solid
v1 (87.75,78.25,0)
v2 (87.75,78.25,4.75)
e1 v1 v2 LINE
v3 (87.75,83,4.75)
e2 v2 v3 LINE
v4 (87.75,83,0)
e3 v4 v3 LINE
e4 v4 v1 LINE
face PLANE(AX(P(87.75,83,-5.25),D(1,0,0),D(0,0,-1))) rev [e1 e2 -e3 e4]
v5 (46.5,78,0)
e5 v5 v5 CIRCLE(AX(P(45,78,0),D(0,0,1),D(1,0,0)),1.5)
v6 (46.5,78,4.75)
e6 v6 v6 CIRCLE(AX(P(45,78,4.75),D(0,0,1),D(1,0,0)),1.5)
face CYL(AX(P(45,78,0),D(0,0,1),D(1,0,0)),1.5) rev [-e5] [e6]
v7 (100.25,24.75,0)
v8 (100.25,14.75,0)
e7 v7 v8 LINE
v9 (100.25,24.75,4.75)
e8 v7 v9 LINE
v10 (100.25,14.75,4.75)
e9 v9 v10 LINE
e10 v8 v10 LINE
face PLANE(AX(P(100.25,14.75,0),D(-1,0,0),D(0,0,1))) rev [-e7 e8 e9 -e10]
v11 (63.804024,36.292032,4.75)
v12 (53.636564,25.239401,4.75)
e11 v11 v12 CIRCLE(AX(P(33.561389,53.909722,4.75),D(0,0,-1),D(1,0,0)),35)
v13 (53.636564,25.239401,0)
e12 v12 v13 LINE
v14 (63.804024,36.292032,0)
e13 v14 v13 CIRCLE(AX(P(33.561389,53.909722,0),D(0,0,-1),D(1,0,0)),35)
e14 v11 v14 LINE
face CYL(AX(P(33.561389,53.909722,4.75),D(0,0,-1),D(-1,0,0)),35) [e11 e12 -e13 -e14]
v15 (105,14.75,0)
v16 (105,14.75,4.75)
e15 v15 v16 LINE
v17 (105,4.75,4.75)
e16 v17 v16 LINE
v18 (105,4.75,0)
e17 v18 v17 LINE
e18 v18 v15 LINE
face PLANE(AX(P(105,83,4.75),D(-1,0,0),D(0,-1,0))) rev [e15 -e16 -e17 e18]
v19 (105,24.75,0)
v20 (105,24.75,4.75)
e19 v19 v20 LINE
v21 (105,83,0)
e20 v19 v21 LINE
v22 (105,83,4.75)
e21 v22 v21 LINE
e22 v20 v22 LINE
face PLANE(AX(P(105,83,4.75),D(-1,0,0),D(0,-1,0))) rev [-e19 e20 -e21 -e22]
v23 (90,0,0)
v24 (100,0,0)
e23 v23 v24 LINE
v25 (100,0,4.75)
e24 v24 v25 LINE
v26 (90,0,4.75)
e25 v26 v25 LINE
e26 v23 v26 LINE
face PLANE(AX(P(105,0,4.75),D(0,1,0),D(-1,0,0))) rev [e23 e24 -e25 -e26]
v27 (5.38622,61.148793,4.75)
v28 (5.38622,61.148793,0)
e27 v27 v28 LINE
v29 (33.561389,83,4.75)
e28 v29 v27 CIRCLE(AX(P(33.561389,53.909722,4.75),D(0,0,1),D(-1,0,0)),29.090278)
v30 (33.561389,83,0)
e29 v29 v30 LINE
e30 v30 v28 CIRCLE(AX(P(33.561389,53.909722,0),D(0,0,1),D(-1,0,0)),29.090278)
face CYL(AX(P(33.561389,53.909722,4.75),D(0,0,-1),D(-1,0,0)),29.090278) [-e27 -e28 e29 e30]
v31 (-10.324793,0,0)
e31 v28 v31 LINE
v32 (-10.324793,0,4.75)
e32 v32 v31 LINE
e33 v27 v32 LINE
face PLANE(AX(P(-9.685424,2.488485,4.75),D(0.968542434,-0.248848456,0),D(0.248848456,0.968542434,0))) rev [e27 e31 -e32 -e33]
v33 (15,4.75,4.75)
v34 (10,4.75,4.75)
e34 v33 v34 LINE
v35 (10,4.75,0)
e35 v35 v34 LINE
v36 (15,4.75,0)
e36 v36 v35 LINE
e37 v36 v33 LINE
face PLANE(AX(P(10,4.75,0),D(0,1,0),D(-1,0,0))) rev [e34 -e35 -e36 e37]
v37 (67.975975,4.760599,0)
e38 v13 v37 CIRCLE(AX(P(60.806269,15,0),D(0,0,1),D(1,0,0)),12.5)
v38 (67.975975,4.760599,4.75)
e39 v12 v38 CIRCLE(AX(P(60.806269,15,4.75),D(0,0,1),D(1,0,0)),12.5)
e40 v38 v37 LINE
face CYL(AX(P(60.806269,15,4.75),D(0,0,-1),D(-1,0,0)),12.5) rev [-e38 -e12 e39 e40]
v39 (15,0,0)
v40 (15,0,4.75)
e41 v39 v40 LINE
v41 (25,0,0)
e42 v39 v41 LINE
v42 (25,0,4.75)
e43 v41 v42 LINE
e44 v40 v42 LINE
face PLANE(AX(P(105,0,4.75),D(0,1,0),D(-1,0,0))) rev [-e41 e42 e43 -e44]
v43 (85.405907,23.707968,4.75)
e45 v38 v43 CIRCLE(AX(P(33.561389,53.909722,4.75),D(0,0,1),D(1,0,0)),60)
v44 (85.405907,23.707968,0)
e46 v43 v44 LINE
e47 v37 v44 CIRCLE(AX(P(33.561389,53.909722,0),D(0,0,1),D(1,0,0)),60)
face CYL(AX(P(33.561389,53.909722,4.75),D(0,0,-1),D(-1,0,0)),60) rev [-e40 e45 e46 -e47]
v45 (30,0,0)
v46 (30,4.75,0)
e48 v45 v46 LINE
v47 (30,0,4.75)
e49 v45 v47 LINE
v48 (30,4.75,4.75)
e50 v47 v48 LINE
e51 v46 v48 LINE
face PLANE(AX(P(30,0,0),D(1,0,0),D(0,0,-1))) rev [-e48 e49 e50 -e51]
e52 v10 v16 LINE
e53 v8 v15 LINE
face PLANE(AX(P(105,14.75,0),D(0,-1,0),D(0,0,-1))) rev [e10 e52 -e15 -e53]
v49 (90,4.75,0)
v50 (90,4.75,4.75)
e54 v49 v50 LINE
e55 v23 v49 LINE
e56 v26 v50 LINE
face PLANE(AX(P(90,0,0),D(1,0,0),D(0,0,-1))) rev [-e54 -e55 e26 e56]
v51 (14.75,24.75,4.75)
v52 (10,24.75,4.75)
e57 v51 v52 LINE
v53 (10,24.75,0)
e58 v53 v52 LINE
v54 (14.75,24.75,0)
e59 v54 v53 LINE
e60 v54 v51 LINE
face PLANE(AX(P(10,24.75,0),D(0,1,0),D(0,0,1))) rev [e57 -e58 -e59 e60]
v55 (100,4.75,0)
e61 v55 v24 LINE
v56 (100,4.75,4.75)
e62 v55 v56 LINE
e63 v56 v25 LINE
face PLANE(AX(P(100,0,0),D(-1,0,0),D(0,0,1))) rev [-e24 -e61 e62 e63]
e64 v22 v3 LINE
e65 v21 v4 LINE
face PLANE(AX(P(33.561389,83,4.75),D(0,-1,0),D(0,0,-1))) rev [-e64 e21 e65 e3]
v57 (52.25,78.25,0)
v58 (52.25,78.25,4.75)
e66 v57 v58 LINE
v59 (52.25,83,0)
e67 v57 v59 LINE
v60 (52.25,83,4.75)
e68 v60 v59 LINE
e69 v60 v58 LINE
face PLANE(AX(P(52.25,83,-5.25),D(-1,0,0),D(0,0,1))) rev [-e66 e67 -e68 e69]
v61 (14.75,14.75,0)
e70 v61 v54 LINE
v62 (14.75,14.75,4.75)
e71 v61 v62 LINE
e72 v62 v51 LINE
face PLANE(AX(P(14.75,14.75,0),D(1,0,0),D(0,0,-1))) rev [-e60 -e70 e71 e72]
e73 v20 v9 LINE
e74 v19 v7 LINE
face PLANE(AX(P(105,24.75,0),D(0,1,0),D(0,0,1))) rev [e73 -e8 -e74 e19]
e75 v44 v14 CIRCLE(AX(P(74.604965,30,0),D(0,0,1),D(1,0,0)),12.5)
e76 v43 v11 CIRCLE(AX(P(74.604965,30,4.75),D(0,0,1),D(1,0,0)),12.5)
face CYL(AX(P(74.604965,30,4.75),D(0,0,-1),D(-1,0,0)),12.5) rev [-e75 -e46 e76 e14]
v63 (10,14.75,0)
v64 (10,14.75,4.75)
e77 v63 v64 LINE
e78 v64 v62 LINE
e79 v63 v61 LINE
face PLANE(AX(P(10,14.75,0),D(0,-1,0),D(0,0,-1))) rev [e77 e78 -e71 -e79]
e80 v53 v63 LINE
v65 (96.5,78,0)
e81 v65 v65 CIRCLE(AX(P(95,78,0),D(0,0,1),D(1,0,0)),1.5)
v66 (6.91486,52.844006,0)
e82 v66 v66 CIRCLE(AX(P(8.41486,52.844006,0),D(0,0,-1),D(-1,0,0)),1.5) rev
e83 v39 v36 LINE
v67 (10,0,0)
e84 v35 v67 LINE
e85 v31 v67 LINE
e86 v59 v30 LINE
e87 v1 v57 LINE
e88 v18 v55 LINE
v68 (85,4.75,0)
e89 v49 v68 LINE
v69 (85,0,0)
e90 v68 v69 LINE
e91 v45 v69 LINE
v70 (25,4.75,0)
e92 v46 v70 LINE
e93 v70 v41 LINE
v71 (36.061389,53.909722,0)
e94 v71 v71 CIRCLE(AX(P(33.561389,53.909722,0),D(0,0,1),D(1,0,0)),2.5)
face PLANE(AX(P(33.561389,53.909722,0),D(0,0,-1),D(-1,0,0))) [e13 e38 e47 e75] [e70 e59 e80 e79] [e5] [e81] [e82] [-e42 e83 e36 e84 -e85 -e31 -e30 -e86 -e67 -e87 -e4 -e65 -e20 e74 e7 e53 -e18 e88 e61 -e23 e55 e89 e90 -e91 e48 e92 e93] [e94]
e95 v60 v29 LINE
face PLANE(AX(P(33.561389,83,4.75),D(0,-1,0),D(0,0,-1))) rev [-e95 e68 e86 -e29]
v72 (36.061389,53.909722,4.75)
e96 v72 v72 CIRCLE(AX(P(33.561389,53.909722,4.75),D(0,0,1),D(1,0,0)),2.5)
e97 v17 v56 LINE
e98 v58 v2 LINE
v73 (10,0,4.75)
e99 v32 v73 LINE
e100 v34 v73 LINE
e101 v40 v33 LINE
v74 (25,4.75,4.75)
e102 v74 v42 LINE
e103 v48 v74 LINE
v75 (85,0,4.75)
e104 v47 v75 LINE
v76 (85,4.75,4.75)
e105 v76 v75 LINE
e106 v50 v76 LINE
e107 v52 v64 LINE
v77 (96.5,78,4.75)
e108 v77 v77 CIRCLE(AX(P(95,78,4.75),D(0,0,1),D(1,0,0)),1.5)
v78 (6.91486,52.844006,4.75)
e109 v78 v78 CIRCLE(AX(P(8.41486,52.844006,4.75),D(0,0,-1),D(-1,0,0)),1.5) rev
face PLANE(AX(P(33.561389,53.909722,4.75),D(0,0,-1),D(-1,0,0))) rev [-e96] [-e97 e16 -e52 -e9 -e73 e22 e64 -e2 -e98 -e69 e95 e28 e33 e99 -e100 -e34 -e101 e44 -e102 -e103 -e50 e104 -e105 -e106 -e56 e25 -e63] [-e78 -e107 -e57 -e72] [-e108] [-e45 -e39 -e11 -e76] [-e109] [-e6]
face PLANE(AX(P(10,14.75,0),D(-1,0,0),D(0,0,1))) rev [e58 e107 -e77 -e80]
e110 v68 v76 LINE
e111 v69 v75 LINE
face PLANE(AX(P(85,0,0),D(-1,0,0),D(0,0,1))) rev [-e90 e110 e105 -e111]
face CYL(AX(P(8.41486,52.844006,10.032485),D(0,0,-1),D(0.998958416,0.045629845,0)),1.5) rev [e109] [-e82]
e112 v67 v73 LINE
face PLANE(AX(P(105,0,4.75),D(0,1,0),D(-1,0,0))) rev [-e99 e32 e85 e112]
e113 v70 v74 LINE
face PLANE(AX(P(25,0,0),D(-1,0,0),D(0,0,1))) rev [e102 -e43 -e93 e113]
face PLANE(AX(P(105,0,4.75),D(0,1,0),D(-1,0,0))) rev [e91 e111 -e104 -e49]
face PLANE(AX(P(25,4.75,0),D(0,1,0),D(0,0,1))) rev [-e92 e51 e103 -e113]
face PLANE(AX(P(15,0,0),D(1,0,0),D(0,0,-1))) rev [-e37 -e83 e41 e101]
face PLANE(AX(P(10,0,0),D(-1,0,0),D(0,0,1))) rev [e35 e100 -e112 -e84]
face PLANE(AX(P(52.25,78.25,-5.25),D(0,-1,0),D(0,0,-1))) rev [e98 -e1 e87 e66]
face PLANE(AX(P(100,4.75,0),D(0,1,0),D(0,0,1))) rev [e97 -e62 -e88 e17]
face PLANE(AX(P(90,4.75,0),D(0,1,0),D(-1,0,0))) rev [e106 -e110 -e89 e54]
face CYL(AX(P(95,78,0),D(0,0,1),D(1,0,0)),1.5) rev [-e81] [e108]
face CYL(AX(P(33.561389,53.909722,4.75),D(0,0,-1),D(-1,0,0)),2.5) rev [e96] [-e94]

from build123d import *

# Parameters (mm, degrees)
SKETCH1_R           = 2.5
BOSS_EXTRUDE1_DEPTH = 4.75
SKETCH2_W           = 5
SKETCH2_H           = 4.75
SKETCH2_W_2         = 4.75
SKETCH2_H_2         = 10
CUT_EXTRUDE1_DEPTH  = 134.927452376
SKETCH3_R           = 1.5
CUT_EXTRUDE2_DEPTH  = 134.927452376
SKETCH4_W           = 35.5
SKETCH4_H           = 4.75
CUT_EXTRUDE3_DEPTH  = 10
CAVITY1_OUTLINE_R   = 1.5
CAVITY1_DEPTH       = 4.75


# Read off the part's stored shape, not the designer's step: Cavity1
with BuildPart() as part:
    # Sketch1 → Boss-Extrude1 (new body)
    with BuildSketch(Plane.XY):
        with BuildLine():
            Line((-9.685424338, 2.488484559), (5.386220056, 61.148792841))
            ThreePointArc((5.386220056, 61.148792841), (15.733633721, 76.897010412), (33.561388608, 83))
            Line((33.561388608, 83), (105, 83))
            Line((105, 83), (105, 0))
            Line((105, 0), (-10.324792855, 0))
            Line((-10.324792855, 0), (-9.685424338, 2.488484559))
        make_face()
        with Locations((33.561388608, 53.909722104)):
            Circle(SKETCH1_R, mode=Mode.SUBTRACT)
        with BuildLine():
            ThreePointArc((67.975974789, 4.760599446), (77.719162031, 13.288409394), (85.405906554, 23.707967867))
            ThreePointArc((85.405906554, 23.707967867), (80.896997447, 40.800941239), (63.804024076, 36.292032133))
            ThreePointArc((63.804024076, 36.292032133), (59.320089771, 30.213956356), (53.63656388, 25.239400554))
            ThreePointArc((53.63656388, 25.239400554), (50.566868781, 7.830294546), (67.975974789, 4.760599446))
        make_face(mode=Mode.SUBTRACT)
    extrude(amount=BOSS_EXTRUDE1_DEPTH)

    # Sketch2 → Cut-Extrude1 (cut, through all)
    with BuildSketch(Plane.XY.offset(4.75)):
        with Locations((12.5, 2.375)):
            Rectangle(SKETCH2_W, SKETCH2_H)
        with Locations((102.5, 2.375)):
            Rectangle(SKETCH2_W, SKETCH2_H)
        with Locations((27.5, 2.375)):
            Rectangle(SKETCH2_W, SKETCH2_H)
        with Locations((87.5, 2.375)):
            Rectangle(SKETCH2_W, SKETCH2_H)
        with Locations((102.625, 19.75)):
            Rectangle(SKETCH2_W_2, SKETCH2_H_2)
        with Locations((12.375, 19.75)):
            Rectangle(SKETCH2_W_2, SKETCH2_H_2)
    extrude(amount=-CUT_EXTRUDE1_DEPTH, mode=Mode.SUBTRACT)

    # Sketch3 → Cut-Extrude2 (cut, through all)
    with BuildSketch(Plane.XY.offset(4.75)):
        with Locations((95, 78)):
            Circle(SKETCH3_R)
        with Locations((45, 78)):
            Circle(SKETCH3_R)
    extrude(amount=-CUT_EXTRUDE2_DEPTH, mode=Mode.SUBTRACT)

    # Sketch4 → Cut-Extrude3 (cut)
    with BuildSketch(Plane.XY.offset(4.75)):
        with Locations((70, 80.625)):
            Rectangle(SKETCH4_W, SKETCH4_H)
    extrude(amount=-CUT_EXTRUDE3_DEPTH, mode=Mode.SUBTRACT)

    # Cavity1 outline → Cavity1 (cut)
    with BuildSketch(Plane.XY):
        with Locations((8.414860226, 52.844005613)):
            Circle(CAVITY1_OUTLINE_R)
    extrude(amount=CAVITY1_DEPTH, mode=Mode.SUBTRACT)


solid = part.part
